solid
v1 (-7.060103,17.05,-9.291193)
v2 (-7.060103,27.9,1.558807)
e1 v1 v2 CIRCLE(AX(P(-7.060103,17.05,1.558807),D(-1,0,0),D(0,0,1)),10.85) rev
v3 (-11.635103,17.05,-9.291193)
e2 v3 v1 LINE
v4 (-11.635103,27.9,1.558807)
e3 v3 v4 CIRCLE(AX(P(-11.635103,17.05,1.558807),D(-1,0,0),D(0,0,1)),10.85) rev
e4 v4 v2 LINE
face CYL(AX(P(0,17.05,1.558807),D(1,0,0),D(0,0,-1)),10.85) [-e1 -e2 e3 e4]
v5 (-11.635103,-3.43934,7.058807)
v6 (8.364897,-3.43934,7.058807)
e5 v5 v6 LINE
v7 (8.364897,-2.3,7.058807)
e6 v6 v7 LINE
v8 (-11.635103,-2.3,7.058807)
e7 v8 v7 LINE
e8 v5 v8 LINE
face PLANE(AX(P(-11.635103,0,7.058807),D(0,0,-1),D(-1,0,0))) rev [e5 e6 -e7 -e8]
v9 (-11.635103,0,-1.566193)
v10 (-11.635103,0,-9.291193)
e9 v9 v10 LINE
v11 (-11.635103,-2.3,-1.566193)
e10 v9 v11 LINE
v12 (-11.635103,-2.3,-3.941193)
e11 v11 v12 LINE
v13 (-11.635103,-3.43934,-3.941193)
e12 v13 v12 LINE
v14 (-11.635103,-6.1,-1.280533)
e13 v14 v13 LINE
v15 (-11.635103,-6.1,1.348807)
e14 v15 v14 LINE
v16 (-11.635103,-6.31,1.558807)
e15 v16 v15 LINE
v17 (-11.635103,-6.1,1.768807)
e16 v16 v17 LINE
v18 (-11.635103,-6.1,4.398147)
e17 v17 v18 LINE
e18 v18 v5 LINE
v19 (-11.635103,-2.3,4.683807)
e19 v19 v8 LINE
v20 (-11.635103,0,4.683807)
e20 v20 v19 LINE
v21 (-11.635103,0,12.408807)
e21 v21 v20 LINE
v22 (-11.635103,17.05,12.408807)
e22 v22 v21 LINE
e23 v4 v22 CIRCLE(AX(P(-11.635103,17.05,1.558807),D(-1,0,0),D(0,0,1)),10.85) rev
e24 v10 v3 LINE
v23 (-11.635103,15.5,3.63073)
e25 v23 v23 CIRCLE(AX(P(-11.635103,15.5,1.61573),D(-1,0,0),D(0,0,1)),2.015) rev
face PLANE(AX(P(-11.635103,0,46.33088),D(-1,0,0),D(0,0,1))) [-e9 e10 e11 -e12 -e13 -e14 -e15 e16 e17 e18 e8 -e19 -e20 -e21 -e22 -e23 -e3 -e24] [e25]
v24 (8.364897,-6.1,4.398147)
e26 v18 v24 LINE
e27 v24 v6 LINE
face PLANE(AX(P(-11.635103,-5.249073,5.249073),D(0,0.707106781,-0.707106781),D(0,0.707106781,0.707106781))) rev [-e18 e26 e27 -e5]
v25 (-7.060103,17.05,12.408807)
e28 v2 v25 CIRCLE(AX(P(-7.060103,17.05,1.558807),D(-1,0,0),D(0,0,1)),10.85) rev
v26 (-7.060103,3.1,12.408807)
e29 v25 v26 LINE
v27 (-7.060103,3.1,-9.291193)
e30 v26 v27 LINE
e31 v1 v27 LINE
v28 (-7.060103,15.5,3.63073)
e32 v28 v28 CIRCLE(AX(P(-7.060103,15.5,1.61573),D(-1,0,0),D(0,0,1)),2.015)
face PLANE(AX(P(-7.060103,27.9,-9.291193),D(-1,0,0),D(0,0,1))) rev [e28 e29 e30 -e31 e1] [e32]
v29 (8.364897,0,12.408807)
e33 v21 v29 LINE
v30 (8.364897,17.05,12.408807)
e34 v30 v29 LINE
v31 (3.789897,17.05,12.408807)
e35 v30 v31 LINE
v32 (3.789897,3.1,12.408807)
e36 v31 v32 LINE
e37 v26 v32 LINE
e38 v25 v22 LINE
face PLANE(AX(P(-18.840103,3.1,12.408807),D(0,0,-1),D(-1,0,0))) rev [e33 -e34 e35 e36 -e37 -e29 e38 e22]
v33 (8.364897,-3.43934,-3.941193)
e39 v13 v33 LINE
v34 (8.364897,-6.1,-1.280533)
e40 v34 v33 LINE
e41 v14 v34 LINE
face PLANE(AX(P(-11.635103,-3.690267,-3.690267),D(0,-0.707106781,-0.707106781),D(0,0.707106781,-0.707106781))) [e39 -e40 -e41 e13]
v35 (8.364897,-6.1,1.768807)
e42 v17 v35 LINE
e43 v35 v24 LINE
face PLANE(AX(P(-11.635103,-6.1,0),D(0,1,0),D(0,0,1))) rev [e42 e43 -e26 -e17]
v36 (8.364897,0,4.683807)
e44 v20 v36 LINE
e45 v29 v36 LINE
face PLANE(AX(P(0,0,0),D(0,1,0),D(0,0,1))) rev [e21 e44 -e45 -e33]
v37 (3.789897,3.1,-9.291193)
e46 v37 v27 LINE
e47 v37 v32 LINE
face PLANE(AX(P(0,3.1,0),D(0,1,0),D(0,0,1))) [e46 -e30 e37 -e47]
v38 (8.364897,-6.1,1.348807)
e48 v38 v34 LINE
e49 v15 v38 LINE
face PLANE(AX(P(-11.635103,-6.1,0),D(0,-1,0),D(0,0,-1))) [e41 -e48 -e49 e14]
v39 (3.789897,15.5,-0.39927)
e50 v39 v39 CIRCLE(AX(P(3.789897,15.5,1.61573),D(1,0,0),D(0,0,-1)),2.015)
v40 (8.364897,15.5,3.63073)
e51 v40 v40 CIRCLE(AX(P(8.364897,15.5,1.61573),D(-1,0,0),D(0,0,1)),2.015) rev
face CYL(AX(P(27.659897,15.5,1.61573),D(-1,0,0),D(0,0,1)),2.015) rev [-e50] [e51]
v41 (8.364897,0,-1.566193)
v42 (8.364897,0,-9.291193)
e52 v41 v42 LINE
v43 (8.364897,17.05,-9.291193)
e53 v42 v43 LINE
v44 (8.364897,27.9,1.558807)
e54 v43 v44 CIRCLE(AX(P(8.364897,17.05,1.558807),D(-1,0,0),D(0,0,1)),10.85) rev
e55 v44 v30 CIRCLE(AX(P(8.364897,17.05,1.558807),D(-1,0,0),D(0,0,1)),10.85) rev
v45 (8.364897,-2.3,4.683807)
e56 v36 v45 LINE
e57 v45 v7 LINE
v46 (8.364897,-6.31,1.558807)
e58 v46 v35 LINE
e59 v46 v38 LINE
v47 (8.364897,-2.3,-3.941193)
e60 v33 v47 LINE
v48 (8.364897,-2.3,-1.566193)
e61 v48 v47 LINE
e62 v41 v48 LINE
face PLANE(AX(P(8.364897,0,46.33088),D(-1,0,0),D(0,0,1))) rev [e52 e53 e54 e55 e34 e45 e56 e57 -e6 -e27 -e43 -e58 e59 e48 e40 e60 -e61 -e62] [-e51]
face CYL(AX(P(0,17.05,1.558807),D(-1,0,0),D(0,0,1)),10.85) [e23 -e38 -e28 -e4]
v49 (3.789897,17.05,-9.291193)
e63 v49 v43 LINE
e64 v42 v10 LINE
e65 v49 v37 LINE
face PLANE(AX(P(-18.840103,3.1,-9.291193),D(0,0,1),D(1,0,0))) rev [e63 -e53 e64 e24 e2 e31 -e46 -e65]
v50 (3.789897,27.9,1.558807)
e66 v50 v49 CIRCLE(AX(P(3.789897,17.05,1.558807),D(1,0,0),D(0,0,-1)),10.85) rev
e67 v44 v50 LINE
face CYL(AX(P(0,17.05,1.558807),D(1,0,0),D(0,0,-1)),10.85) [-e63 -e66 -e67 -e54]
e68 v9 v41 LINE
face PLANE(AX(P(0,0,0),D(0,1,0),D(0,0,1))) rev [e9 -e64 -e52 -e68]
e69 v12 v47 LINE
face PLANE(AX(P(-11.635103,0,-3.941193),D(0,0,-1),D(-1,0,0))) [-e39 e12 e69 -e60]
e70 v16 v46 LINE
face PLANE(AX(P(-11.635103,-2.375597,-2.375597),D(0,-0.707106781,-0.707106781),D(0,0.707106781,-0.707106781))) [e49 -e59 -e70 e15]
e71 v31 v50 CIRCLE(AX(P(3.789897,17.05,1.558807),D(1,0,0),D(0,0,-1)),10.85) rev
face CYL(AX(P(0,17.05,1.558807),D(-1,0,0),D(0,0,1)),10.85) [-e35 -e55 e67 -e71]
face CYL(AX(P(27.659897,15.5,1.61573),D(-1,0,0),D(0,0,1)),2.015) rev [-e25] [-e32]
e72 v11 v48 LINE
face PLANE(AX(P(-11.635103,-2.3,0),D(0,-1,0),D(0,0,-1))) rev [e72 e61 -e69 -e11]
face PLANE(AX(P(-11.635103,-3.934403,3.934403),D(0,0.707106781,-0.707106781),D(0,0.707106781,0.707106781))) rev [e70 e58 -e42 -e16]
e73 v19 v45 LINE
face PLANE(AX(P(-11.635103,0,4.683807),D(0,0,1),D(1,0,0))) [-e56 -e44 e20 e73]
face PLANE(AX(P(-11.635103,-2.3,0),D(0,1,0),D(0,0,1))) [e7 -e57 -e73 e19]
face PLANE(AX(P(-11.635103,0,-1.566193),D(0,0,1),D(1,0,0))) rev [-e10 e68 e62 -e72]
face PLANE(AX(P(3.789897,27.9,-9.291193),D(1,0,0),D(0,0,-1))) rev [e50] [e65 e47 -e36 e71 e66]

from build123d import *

# Parameters (mm, degrees)
SKETCH1_W           = 150
SKETCH1_H           = 70
BOSS_EXTRUDE1_DEPTH = 10
SKETCH2_W           = 18
SKETCH2_H           = 70
BOSS_EXTRUDE2_DEPTH = 80
FILLET1_R           = 35
SKETCH3_R           = 6.5
CUT_EXTRUDE1_DEPTH  = 164.102034121
RIB1_REACH          = 134.904
SKETCH5_WALL_W      = 321.142477346
SKETCH5_WALL_H      = 40
SKETCH7_W           = 43.830511012
SKETCH7_H           = 10.028409091
CUT_EXTRUDE2_DEPTH  = 80
SCALE1_SCALE        = 0.31
CUT_EXTRUDE5_REACH  = 46.882
SKETCH11_W          = 1.005
SKETCH11_H          = 10.85
SKETCH11_H_2        = 13.95
BOSS_EXTRUDE3_DEPTH = 20


with BuildPart() as part:
    # Sketch1 → Boss-Extrude1 (new body)
    with BuildSketch(Plane(origin=(0, 0, 0), x_dir=(1, 0, 0), z_dir=(0, 1, 0))):
        with Locations((14.225473782, -5.028409091)):
            Rectangle(SKETCH1_W, SKETCH1_H)
    extrude(amount=BOSS_EXTRUDE1_DEPTH)

    # Sketch2 → Boss-Extrude2 (add)
    with BuildSketch(Plane(origin=(0, 10, 0), x_dir=(1, 0, 0), z_dir=(0, 1, 0))):
        with Locations((-31.774526218, -5.028409091)):
            Rectangle(SKETCH2_W, SKETCH2_H)
        with Locations((21.225473782, -5.028409091)):
            Rectangle(SKETCH2_W, SKETCH2_H)
    extrude(amount=BOSS_EXTRUDE2_DEPTH)

    # Fillet1
    fillet1_edges = [part.edges().sort_by_distance(p)[0] for p in [
        (21.225473782, 90, 40.028409091),
        (21.225473782, 90, -29.971590909),
        (-31.774526218, 90, -29.971590909),
        (-31.774526218, 90, 40.028409091),
    ]]
    fillet(fillet1_edges, radius=FILLET1_R - 0.0001)  # a hair under: the kernel refuses the full size

    # Sketch3 → Cut-Extrude1 (cut, through all)
    with BuildSketch(Plane.ZY.offset(40.774526218)):
        with Locations((5.212032143, 50)):
            Circle(SKETCH3_R)
    extrude(amount=-CUT_EXTRUDE1_DEPTH, mode=Mode.SUBTRACT)

    # Sketch5 wall → Rib1 (add, up to next)
    with BuildSketch(Plane(origin=(52.140729288, 25.194278726, 0), x_dir=(0.821802771323, -0.569772064116, 0), z_dir=(0.569772064116, 0.821802771323, 0)), mode=Mode.PRIVATE) as rib1_sk1:
        Rectangle(SKETCH5_WALL_W, SKETCH5_WALL_H)
    rib1_tool1 = extrude(rib1_sk1.sketch, amount=-RIB1_REACH, mode=Mode.PRIVATE) - part.part
    add(rib1_tool1.solids().sort_by_distance((52.140729288, 25.194278726, 0))[0])

    # Sketch7 → Cut-Extrude2 (cut)
    with BuildSketch(Plane(origin=(0, 10, 0), x_dir=(1, 0, 0), z_dir=(0, 1, 0))):
        with Locations((52.140729288, 14.985795454)):
            Rectangle(SKETCH7_W, SKETCH7_H)
    extrude(amount=CUT_EXTRUDE2_DEPTH, mode=Mode.SUBTRACT)


with BuildPart() as part_1:
    # Scale1: scaled about (0, 0, 0)
    add(part.part.scale(SCALE1_SCALE))

    # Sketch11 → Cut-Extrude5 (cut, up to next)
    with BuildSketch(Plane(origin=(0, 0, -9.291193182), x_dir=(-1, 0, 0), z_dir=(0, 0, -1)), mode=Mode.PRIVATE) as cut_extrude5_sk1:
        Polygon((-9.369896872, 3.1), (-8.364896872, 3.1), (-8.364896872, 17.05), (-9.369896872, 17.05), (-9.369896872, 12.52045281), align=None)
    cut_extrude5_tool1 = extrude(cut_extrude5_sk1.sketch, amount=-CUT_EXTRUDE5_REACH, mode=Mode.PRIVATE) & part_1.part
    # Sketch11 → Cut-Extrude5 (cut, up to next)
    with BuildSketch(Plane(origin=(0, 0, -9.291193182), x_dir=(-1, 0, 0), z_dir=(0, 0, -1)), mode=Mode.PRIVATE) as cut_extrude5_sk2:
        with Locations((-8.867396872, 22.475)):
            Rectangle(SKETCH11_W, SKETCH11_H)
    cut_extrude5_tool2 = extrude(cut_extrude5_sk2.sketch, amount=-CUT_EXTRUDE5_REACH, mode=Mode.PRIVATE) & part_1.part
    # Sketch11 → Cut-Extrude5 (cut, up to next)
    with BuildSketch(Plane(origin=(0, 0, -9.291193182), x_dir=(-1, 0, 0), z_dir=(0, 0, -1)), mode=Mode.PRIVATE) as cut_extrude5_sk3:
        Polygon((-22.957355286, 3.1), (-9.369896872, 3.1), (-9.369896872, 12.52045281), align=None)
    cut_extrude5_tool3 = extrude(cut_extrude5_sk3.sketch, amount=-CUT_EXTRUDE5_REACH, mode=Mode.PRIVATE) & part_1.part
    # Sketch11 → Cut-Extrude5 (cut, up to next)
    with BuildSketch(Plane(origin=(0, 0, -9.291193182), x_dir=(-1, 0, 0), z_dir=(0, 0, -1)), mode=Mode.PRIVATE) as cut_extrude5_sk4:
        Polygon((-8.364896872, 0), (-8.364896872, 3.1), (-9.369896872, 3.1), (-22.957355286, 3.1), (-27.659896872, 3.1), (-27.659896872, 0), align=None)
    cut_extrude5_tool4 = extrude(cut_extrude5_sk4.sketch, amount=-CUT_EXTRUDE5_REACH, mode=Mode.PRIVATE) & part_1.part
    # Sketch11 → Cut-Extrude5 (cut, up to next)
    with BuildSketch(Plane(origin=(0, 0, -9.291193182), x_dir=(-1, 0, 0), z_dir=(0, 0, -1)), mode=Mode.PRIVATE) as cut_extrude5_sk5:
        with Locations((12.137603128, 10.075)):
            Rectangle(SKETCH11_W, SKETCH11_H_2)
    cut_extrude5_tool5 = extrude(cut_extrude5_sk5.sketch, amount=-CUT_EXTRUDE5_REACH, mode=Mode.PRIVATE) & part_1.part
    # Sketch11 → Cut-Extrude5 (cut, up to next)
    with BuildSketch(Plane(origin=(0, 0, -9.291193182), x_dir=(-1, 0, 0), z_dir=(0, 0, -1)), mode=Mode.PRIVATE) as cut_extrude5_sk6:
        with Locations((12.137603128, 22.475)):
            Rectangle(SKETCH11_W, SKETCH11_H)
    cut_extrude5_tool6 = extrude(cut_extrude5_sk6.sketch, amount=-CUT_EXTRUDE5_REACH, mode=Mode.PRIVATE) & part_1.part
    # Sketch11 → Cut-Extrude5 (cut, up to next)
    with BuildSketch(Plane(origin=(0, 0, -9.291193182), x_dir=(-1, 0, 0), z_dir=(0, 0, -1)), mode=Mode.PRIVATE) as cut_extrude5_sk7:
        Polygon((12.640103128, 3.1), (11.635103128, 3.1), (11.635103128, 0), (18.840103128, 0), (18.840103128, 3.1), align=None)
    cut_extrude5_tool7 = extrude(cut_extrude5_sk7.sketch, amount=-CUT_EXTRUDE5_REACH, mode=Mode.PRIVATE) & part_1.part
    add(cut_extrude5_tool1.solids().sort_by_distance((8.867397, 10.075, -9.291193))[0], mode=Mode.SUBTRACT)
    add(cut_extrude5_tool2.solids().sort_by_distance((8.867397, 22.475, -9.291193))[0], mode=Mode.SUBTRACT)
    add(cut_extrude5_tool3.solids().sort_by_distance((13.89905, 6.240151, -9.291193))[0], mode=Mode.SUBTRACT)
    add(cut_extrude5_tool4.solids().sort_by_distance((18.012397, 1.55, -9.291193))[0], mode=Mode.SUBTRACT)
    add(cut_extrude5_tool5.solids().sort_by_distance((-12.137603, 10.075, -9.291193))[0], mode=Mode.SUBTRACT)
    add(cut_extrude5_tool6.solids().sort_by_distance((-12.137603, 22.475, -9.291193))[0], mode=Mode.SUBTRACT)
    add(cut_extrude5_tool7.solids().sort_by_distance((-15.237603, 1.55, -9.291193))[0], mode=Mode.SUBTRACT)

    # Sketch13 → Boss-Extrude3 (add)
    with BuildSketch(Plane(origin=(8.364896872, 0, 0), x_dir=(0, 0, -1), z_dir=(1, 0, 0))):
        Polygon((1.566193182, -1.455), (1.566193182, 0), (-4.683806818, 0), (-4.683806818, -1.455), (-4.683806818, -1.8), (-4.683806818, -2.3), (-7.058806818, -2.3), (-7.058806818, -3.439339828), (-4.398146646, -6.1), (-1.768806818, -6.1), (-1.558806818, -6.31), (-1.348806818, -6.1), (1.28053301, -6.1), (3.941193182, -3.439339828), (3.941193182, -2.3), (1.566193182, -2.3), (1.566193182, -1.8), align=None)
    extrude(amount=-BOSS_EXTRUDE3_DEPTH)


solid = part_1.part
